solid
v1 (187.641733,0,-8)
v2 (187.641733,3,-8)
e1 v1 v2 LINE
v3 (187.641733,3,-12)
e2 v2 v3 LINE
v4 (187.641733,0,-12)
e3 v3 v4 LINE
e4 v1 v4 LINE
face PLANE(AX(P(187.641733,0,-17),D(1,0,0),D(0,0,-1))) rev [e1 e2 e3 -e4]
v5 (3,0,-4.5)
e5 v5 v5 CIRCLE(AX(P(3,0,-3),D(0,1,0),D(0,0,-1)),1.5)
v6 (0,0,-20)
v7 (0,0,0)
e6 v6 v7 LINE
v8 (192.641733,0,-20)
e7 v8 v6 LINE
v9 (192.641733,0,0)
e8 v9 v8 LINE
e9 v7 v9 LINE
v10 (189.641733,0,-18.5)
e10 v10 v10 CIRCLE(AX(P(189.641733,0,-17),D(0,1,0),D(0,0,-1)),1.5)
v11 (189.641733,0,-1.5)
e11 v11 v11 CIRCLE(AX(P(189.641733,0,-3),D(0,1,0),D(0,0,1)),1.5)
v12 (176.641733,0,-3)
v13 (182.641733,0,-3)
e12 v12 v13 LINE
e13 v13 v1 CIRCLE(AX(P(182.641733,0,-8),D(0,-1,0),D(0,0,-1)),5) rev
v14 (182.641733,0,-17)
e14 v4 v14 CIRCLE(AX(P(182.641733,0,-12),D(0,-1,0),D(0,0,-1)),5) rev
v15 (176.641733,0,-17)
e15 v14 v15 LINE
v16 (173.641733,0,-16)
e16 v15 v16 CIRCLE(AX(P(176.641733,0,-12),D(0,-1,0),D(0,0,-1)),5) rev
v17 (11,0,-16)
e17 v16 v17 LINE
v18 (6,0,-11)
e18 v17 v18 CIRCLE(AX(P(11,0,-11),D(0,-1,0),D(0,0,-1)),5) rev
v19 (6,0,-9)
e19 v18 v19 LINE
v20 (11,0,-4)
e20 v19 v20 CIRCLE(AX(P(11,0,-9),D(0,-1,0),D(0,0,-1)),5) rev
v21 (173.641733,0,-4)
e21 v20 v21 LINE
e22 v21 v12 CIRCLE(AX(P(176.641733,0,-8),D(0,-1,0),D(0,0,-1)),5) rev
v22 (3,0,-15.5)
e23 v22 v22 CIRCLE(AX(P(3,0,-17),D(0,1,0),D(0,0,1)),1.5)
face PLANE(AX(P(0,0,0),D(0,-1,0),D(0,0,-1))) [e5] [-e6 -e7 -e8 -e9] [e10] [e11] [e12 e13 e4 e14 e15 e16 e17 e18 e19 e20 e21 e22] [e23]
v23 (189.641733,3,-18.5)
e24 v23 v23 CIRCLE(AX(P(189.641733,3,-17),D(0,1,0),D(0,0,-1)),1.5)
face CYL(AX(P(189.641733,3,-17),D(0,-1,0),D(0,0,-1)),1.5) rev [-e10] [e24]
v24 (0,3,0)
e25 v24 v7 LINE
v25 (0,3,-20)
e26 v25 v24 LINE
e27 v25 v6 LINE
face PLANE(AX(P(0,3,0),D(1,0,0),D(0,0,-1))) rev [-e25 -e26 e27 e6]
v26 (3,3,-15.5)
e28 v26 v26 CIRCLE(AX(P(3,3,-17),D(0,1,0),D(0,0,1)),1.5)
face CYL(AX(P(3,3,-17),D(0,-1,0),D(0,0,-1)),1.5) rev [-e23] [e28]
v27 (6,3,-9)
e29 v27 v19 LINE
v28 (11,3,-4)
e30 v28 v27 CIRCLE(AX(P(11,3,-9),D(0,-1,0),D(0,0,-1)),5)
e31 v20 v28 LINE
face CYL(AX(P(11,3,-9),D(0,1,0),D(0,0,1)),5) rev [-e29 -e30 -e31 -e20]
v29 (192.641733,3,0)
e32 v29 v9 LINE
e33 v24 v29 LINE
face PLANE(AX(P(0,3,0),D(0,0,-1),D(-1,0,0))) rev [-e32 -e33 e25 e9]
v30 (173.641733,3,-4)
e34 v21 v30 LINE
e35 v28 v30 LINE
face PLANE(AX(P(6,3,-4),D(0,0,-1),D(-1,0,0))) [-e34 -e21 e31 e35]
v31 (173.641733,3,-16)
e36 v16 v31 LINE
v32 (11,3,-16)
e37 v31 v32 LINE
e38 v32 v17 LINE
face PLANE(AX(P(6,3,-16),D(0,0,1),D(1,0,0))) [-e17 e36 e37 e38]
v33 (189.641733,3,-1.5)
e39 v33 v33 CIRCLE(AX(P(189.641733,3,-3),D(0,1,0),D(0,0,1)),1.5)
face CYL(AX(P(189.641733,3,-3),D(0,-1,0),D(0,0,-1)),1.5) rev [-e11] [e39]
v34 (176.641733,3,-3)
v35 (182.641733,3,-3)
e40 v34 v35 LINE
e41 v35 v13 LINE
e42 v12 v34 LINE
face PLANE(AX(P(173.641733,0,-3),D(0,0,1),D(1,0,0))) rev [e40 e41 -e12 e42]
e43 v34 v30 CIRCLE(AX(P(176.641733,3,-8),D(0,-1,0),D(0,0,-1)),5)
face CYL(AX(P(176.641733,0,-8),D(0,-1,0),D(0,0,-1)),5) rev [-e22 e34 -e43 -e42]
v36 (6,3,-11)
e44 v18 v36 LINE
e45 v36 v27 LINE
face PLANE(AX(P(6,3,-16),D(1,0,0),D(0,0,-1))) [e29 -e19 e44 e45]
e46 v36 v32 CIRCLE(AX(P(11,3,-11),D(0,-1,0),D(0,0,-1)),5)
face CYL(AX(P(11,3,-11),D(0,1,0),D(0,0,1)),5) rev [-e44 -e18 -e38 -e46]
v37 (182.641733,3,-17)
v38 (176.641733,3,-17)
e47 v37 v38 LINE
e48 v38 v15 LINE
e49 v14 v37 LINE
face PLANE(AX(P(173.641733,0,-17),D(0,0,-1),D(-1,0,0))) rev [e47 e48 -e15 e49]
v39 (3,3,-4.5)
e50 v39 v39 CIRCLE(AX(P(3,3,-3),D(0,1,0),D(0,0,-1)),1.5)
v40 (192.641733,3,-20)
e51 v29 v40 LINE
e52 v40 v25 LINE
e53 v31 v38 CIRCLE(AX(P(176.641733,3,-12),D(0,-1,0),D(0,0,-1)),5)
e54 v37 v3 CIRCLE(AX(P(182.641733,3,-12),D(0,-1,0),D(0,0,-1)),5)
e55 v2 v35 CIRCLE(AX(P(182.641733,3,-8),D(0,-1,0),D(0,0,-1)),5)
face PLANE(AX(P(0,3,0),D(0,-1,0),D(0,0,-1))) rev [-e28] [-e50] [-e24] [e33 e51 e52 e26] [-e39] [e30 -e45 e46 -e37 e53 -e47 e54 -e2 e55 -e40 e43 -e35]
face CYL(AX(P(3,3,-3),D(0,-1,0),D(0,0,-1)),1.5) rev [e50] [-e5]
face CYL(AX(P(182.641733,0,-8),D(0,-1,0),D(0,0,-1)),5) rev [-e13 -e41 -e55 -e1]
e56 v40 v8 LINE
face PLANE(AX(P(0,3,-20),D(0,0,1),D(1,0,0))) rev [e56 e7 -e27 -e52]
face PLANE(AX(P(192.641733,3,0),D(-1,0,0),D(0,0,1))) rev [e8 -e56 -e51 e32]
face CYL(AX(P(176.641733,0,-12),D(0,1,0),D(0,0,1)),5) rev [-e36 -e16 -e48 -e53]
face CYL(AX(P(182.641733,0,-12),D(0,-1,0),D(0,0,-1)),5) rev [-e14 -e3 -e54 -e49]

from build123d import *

# Parameters (mm, degrees)
SKETCH1_W           = 192.641732707
SKETCH1_H           = 20
SKETCH1_R           = 1.5
SKETCH1_W_2         = 180.641732707
SKETCH1_H_2         = 12
BOSS_EXTRUDE1_DEPTH = 3
CUT_EXTRUDE1_DEPTH  = 194.700379918
FILLET1_R           = 5


with BuildPart() as part:
    # Sketch1 → Boss-Extrude1 (new body)
    with BuildSketch(Plane(origin=(0, 0, 0), x_dir=(1, 0, 0), z_dir=(0, 1, 0))):
        with Locations((96.320866354, 10)):
            Rectangle(SKETCH1_W, SKETCH1_H)
        with Locations(Location((3, 17, 0), (0, 0, 270))):
            Circle(SKETCH1_R, mode=Mode.SUBTRACT)
        with Locations(Location((3, 3, 0), (0, 0, 90))):
            Circle(SKETCH1_R, mode=Mode.SUBTRACT)
        with Locations(Location((189.641732707, 3, 0), (0, 0, 270))):
            Circle(SKETCH1_R, mode=Mode.SUBTRACT)
        with Locations(Location((189.641732707, 17, 0), (0, 0, 90))):
            Circle(SKETCH1_R, mode=Mode.SUBTRACT)
        with Locations((96.320866354, 10)):
            Rectangle(SKETCH1_W_2, SKETCH1_H_2, mode=Mode.SUBTRACT)
    extrude(amount=BOSS_EXTRUDE1_DEPTH)

    # Sketch2 → Cut-Extrude1 (cut, through all)
    with BuildSketch(Plane(origin=(0, 3, 0), x_dir=(1, 0, 0), z_dir=(0, 1, 0))):
        Polygon((173.641732707, 17), (173.641732707, 16), (186.641732707, 16), (186.641732707, 4), (173.641732707, 4), (173.641732707, 3), (187.641732707, 3), (187.641732707, 17), align=None)
    extrude(amount=-CUT_EXTRUDE1_DEPTH, mode=Mode.SUBTRACT)

    # Fillet1
    # the kernel refuses this fillet: 5 mm, written as the material it adds along each edge
    with BuildSketch(Plane(origin=(187.641732707, 3, -17), x_dir=(0, 0, 1), z_dir=(0, -1, 0)), Plane(origin=(187.641732707, 3, -3), x_dir=(-1, 0, 0), z_dir=(0, -1, 0)), Plane(origin=(6, 0, -16), x_dir=(0, 0, 1), z_dir=(0, 1, 0))) as fillet1_piece_1:
        with BuildLine():
            CenterArc((FILLET1_R, FILLET1_R), FILLET1_R, 180, 90)
            Line((0, FILLET1_R), (-FILLET1_R * 0.02, FILLET1_R))
            Line((-FILLET1_R * 0.02, FILLET1_R), (-FILLET1_R * 0.02, -FILLET1_R * 0.02))
            Line((-FILLET1_R * 0.02, -FILLET1_R * 0.02), (FILLET1_R, -FILLET1_R * 0.02))
            Line((FILLET1_R, -FILLET1_R * 0.02), (FILLET1_R, 0))
        make_face()
    extrude(amount=3)
    with BuildSketch(Plane(origin=(173.641732707, 3, -17), x_dir=(1, 0, 0), z_dir=(0, -1, 0))) as fillet1_piece_2:
        with BuildLine():
            CenterArc((3, 5), FILLET1_R, 233.130102354, 36.869897646)
            Line((0, 1), (-0.06, 0.92))
            ThreePointArc((-0.06, 0.92), (-0.1, 0.5), (-0.1, 0))
            Line((-0.1, 0), (0, -0.1))
            Line((0, -0.1), (3, -0.1))
            Line((3, -0.1), (3, 0))
        make_face()
    extrude(amount=3)
    with BuildSketch(Plane(origin=(173.641732707, 3, -3), x_dir=(0, 0, -1), z_dir=(0, -1, 0))) as fillet1_piece_3:
        with BuildLine():
            CenterArc((5, 3), FILLET1_R, 180, 36.869897646)
            Line((0, 3), (-0.1, 3))
            Line((-0.1, 3), (-0.1, 0))
            Line((-0.1, 0), (0, -0.1))
            ThreePointArc((0, -0.1), (0.5, -0.1), (0.92, -0.06))
            Line((0.92, -0.06), (1, 0))
        make_face()
    extrude(amount=3)
    with BuildSketch(Plane(origin=(6, 0, -4), x_dir=(0, 0, -1), z_dir=(0, 1, 0))) as fillet1_piece_4:
        with BuildLine():
            CenterArc((FILLET1_R, -FILLET1_R), FILLET1_R, 90, 90)
            Line((0, -FILLET1_R), (-FILLET1_R * 0.02, -FILLET1_R))
            Line((-FILLET1_R * 0.02, -FILLET1_R), (-FILLET1_R * 0.02, FILLET1_R * 0.02))
            Line((-FILLET1_R * 0.02, FILLET1_R * 0.02), (FILLET1_R, FILLET1_R * 0.02))
            Line((FILLET1_R, FILLET1_R * 0.02), (FILLET1_R, 0))
        make_face()
    extrude(amount=3)


solid = part.part
